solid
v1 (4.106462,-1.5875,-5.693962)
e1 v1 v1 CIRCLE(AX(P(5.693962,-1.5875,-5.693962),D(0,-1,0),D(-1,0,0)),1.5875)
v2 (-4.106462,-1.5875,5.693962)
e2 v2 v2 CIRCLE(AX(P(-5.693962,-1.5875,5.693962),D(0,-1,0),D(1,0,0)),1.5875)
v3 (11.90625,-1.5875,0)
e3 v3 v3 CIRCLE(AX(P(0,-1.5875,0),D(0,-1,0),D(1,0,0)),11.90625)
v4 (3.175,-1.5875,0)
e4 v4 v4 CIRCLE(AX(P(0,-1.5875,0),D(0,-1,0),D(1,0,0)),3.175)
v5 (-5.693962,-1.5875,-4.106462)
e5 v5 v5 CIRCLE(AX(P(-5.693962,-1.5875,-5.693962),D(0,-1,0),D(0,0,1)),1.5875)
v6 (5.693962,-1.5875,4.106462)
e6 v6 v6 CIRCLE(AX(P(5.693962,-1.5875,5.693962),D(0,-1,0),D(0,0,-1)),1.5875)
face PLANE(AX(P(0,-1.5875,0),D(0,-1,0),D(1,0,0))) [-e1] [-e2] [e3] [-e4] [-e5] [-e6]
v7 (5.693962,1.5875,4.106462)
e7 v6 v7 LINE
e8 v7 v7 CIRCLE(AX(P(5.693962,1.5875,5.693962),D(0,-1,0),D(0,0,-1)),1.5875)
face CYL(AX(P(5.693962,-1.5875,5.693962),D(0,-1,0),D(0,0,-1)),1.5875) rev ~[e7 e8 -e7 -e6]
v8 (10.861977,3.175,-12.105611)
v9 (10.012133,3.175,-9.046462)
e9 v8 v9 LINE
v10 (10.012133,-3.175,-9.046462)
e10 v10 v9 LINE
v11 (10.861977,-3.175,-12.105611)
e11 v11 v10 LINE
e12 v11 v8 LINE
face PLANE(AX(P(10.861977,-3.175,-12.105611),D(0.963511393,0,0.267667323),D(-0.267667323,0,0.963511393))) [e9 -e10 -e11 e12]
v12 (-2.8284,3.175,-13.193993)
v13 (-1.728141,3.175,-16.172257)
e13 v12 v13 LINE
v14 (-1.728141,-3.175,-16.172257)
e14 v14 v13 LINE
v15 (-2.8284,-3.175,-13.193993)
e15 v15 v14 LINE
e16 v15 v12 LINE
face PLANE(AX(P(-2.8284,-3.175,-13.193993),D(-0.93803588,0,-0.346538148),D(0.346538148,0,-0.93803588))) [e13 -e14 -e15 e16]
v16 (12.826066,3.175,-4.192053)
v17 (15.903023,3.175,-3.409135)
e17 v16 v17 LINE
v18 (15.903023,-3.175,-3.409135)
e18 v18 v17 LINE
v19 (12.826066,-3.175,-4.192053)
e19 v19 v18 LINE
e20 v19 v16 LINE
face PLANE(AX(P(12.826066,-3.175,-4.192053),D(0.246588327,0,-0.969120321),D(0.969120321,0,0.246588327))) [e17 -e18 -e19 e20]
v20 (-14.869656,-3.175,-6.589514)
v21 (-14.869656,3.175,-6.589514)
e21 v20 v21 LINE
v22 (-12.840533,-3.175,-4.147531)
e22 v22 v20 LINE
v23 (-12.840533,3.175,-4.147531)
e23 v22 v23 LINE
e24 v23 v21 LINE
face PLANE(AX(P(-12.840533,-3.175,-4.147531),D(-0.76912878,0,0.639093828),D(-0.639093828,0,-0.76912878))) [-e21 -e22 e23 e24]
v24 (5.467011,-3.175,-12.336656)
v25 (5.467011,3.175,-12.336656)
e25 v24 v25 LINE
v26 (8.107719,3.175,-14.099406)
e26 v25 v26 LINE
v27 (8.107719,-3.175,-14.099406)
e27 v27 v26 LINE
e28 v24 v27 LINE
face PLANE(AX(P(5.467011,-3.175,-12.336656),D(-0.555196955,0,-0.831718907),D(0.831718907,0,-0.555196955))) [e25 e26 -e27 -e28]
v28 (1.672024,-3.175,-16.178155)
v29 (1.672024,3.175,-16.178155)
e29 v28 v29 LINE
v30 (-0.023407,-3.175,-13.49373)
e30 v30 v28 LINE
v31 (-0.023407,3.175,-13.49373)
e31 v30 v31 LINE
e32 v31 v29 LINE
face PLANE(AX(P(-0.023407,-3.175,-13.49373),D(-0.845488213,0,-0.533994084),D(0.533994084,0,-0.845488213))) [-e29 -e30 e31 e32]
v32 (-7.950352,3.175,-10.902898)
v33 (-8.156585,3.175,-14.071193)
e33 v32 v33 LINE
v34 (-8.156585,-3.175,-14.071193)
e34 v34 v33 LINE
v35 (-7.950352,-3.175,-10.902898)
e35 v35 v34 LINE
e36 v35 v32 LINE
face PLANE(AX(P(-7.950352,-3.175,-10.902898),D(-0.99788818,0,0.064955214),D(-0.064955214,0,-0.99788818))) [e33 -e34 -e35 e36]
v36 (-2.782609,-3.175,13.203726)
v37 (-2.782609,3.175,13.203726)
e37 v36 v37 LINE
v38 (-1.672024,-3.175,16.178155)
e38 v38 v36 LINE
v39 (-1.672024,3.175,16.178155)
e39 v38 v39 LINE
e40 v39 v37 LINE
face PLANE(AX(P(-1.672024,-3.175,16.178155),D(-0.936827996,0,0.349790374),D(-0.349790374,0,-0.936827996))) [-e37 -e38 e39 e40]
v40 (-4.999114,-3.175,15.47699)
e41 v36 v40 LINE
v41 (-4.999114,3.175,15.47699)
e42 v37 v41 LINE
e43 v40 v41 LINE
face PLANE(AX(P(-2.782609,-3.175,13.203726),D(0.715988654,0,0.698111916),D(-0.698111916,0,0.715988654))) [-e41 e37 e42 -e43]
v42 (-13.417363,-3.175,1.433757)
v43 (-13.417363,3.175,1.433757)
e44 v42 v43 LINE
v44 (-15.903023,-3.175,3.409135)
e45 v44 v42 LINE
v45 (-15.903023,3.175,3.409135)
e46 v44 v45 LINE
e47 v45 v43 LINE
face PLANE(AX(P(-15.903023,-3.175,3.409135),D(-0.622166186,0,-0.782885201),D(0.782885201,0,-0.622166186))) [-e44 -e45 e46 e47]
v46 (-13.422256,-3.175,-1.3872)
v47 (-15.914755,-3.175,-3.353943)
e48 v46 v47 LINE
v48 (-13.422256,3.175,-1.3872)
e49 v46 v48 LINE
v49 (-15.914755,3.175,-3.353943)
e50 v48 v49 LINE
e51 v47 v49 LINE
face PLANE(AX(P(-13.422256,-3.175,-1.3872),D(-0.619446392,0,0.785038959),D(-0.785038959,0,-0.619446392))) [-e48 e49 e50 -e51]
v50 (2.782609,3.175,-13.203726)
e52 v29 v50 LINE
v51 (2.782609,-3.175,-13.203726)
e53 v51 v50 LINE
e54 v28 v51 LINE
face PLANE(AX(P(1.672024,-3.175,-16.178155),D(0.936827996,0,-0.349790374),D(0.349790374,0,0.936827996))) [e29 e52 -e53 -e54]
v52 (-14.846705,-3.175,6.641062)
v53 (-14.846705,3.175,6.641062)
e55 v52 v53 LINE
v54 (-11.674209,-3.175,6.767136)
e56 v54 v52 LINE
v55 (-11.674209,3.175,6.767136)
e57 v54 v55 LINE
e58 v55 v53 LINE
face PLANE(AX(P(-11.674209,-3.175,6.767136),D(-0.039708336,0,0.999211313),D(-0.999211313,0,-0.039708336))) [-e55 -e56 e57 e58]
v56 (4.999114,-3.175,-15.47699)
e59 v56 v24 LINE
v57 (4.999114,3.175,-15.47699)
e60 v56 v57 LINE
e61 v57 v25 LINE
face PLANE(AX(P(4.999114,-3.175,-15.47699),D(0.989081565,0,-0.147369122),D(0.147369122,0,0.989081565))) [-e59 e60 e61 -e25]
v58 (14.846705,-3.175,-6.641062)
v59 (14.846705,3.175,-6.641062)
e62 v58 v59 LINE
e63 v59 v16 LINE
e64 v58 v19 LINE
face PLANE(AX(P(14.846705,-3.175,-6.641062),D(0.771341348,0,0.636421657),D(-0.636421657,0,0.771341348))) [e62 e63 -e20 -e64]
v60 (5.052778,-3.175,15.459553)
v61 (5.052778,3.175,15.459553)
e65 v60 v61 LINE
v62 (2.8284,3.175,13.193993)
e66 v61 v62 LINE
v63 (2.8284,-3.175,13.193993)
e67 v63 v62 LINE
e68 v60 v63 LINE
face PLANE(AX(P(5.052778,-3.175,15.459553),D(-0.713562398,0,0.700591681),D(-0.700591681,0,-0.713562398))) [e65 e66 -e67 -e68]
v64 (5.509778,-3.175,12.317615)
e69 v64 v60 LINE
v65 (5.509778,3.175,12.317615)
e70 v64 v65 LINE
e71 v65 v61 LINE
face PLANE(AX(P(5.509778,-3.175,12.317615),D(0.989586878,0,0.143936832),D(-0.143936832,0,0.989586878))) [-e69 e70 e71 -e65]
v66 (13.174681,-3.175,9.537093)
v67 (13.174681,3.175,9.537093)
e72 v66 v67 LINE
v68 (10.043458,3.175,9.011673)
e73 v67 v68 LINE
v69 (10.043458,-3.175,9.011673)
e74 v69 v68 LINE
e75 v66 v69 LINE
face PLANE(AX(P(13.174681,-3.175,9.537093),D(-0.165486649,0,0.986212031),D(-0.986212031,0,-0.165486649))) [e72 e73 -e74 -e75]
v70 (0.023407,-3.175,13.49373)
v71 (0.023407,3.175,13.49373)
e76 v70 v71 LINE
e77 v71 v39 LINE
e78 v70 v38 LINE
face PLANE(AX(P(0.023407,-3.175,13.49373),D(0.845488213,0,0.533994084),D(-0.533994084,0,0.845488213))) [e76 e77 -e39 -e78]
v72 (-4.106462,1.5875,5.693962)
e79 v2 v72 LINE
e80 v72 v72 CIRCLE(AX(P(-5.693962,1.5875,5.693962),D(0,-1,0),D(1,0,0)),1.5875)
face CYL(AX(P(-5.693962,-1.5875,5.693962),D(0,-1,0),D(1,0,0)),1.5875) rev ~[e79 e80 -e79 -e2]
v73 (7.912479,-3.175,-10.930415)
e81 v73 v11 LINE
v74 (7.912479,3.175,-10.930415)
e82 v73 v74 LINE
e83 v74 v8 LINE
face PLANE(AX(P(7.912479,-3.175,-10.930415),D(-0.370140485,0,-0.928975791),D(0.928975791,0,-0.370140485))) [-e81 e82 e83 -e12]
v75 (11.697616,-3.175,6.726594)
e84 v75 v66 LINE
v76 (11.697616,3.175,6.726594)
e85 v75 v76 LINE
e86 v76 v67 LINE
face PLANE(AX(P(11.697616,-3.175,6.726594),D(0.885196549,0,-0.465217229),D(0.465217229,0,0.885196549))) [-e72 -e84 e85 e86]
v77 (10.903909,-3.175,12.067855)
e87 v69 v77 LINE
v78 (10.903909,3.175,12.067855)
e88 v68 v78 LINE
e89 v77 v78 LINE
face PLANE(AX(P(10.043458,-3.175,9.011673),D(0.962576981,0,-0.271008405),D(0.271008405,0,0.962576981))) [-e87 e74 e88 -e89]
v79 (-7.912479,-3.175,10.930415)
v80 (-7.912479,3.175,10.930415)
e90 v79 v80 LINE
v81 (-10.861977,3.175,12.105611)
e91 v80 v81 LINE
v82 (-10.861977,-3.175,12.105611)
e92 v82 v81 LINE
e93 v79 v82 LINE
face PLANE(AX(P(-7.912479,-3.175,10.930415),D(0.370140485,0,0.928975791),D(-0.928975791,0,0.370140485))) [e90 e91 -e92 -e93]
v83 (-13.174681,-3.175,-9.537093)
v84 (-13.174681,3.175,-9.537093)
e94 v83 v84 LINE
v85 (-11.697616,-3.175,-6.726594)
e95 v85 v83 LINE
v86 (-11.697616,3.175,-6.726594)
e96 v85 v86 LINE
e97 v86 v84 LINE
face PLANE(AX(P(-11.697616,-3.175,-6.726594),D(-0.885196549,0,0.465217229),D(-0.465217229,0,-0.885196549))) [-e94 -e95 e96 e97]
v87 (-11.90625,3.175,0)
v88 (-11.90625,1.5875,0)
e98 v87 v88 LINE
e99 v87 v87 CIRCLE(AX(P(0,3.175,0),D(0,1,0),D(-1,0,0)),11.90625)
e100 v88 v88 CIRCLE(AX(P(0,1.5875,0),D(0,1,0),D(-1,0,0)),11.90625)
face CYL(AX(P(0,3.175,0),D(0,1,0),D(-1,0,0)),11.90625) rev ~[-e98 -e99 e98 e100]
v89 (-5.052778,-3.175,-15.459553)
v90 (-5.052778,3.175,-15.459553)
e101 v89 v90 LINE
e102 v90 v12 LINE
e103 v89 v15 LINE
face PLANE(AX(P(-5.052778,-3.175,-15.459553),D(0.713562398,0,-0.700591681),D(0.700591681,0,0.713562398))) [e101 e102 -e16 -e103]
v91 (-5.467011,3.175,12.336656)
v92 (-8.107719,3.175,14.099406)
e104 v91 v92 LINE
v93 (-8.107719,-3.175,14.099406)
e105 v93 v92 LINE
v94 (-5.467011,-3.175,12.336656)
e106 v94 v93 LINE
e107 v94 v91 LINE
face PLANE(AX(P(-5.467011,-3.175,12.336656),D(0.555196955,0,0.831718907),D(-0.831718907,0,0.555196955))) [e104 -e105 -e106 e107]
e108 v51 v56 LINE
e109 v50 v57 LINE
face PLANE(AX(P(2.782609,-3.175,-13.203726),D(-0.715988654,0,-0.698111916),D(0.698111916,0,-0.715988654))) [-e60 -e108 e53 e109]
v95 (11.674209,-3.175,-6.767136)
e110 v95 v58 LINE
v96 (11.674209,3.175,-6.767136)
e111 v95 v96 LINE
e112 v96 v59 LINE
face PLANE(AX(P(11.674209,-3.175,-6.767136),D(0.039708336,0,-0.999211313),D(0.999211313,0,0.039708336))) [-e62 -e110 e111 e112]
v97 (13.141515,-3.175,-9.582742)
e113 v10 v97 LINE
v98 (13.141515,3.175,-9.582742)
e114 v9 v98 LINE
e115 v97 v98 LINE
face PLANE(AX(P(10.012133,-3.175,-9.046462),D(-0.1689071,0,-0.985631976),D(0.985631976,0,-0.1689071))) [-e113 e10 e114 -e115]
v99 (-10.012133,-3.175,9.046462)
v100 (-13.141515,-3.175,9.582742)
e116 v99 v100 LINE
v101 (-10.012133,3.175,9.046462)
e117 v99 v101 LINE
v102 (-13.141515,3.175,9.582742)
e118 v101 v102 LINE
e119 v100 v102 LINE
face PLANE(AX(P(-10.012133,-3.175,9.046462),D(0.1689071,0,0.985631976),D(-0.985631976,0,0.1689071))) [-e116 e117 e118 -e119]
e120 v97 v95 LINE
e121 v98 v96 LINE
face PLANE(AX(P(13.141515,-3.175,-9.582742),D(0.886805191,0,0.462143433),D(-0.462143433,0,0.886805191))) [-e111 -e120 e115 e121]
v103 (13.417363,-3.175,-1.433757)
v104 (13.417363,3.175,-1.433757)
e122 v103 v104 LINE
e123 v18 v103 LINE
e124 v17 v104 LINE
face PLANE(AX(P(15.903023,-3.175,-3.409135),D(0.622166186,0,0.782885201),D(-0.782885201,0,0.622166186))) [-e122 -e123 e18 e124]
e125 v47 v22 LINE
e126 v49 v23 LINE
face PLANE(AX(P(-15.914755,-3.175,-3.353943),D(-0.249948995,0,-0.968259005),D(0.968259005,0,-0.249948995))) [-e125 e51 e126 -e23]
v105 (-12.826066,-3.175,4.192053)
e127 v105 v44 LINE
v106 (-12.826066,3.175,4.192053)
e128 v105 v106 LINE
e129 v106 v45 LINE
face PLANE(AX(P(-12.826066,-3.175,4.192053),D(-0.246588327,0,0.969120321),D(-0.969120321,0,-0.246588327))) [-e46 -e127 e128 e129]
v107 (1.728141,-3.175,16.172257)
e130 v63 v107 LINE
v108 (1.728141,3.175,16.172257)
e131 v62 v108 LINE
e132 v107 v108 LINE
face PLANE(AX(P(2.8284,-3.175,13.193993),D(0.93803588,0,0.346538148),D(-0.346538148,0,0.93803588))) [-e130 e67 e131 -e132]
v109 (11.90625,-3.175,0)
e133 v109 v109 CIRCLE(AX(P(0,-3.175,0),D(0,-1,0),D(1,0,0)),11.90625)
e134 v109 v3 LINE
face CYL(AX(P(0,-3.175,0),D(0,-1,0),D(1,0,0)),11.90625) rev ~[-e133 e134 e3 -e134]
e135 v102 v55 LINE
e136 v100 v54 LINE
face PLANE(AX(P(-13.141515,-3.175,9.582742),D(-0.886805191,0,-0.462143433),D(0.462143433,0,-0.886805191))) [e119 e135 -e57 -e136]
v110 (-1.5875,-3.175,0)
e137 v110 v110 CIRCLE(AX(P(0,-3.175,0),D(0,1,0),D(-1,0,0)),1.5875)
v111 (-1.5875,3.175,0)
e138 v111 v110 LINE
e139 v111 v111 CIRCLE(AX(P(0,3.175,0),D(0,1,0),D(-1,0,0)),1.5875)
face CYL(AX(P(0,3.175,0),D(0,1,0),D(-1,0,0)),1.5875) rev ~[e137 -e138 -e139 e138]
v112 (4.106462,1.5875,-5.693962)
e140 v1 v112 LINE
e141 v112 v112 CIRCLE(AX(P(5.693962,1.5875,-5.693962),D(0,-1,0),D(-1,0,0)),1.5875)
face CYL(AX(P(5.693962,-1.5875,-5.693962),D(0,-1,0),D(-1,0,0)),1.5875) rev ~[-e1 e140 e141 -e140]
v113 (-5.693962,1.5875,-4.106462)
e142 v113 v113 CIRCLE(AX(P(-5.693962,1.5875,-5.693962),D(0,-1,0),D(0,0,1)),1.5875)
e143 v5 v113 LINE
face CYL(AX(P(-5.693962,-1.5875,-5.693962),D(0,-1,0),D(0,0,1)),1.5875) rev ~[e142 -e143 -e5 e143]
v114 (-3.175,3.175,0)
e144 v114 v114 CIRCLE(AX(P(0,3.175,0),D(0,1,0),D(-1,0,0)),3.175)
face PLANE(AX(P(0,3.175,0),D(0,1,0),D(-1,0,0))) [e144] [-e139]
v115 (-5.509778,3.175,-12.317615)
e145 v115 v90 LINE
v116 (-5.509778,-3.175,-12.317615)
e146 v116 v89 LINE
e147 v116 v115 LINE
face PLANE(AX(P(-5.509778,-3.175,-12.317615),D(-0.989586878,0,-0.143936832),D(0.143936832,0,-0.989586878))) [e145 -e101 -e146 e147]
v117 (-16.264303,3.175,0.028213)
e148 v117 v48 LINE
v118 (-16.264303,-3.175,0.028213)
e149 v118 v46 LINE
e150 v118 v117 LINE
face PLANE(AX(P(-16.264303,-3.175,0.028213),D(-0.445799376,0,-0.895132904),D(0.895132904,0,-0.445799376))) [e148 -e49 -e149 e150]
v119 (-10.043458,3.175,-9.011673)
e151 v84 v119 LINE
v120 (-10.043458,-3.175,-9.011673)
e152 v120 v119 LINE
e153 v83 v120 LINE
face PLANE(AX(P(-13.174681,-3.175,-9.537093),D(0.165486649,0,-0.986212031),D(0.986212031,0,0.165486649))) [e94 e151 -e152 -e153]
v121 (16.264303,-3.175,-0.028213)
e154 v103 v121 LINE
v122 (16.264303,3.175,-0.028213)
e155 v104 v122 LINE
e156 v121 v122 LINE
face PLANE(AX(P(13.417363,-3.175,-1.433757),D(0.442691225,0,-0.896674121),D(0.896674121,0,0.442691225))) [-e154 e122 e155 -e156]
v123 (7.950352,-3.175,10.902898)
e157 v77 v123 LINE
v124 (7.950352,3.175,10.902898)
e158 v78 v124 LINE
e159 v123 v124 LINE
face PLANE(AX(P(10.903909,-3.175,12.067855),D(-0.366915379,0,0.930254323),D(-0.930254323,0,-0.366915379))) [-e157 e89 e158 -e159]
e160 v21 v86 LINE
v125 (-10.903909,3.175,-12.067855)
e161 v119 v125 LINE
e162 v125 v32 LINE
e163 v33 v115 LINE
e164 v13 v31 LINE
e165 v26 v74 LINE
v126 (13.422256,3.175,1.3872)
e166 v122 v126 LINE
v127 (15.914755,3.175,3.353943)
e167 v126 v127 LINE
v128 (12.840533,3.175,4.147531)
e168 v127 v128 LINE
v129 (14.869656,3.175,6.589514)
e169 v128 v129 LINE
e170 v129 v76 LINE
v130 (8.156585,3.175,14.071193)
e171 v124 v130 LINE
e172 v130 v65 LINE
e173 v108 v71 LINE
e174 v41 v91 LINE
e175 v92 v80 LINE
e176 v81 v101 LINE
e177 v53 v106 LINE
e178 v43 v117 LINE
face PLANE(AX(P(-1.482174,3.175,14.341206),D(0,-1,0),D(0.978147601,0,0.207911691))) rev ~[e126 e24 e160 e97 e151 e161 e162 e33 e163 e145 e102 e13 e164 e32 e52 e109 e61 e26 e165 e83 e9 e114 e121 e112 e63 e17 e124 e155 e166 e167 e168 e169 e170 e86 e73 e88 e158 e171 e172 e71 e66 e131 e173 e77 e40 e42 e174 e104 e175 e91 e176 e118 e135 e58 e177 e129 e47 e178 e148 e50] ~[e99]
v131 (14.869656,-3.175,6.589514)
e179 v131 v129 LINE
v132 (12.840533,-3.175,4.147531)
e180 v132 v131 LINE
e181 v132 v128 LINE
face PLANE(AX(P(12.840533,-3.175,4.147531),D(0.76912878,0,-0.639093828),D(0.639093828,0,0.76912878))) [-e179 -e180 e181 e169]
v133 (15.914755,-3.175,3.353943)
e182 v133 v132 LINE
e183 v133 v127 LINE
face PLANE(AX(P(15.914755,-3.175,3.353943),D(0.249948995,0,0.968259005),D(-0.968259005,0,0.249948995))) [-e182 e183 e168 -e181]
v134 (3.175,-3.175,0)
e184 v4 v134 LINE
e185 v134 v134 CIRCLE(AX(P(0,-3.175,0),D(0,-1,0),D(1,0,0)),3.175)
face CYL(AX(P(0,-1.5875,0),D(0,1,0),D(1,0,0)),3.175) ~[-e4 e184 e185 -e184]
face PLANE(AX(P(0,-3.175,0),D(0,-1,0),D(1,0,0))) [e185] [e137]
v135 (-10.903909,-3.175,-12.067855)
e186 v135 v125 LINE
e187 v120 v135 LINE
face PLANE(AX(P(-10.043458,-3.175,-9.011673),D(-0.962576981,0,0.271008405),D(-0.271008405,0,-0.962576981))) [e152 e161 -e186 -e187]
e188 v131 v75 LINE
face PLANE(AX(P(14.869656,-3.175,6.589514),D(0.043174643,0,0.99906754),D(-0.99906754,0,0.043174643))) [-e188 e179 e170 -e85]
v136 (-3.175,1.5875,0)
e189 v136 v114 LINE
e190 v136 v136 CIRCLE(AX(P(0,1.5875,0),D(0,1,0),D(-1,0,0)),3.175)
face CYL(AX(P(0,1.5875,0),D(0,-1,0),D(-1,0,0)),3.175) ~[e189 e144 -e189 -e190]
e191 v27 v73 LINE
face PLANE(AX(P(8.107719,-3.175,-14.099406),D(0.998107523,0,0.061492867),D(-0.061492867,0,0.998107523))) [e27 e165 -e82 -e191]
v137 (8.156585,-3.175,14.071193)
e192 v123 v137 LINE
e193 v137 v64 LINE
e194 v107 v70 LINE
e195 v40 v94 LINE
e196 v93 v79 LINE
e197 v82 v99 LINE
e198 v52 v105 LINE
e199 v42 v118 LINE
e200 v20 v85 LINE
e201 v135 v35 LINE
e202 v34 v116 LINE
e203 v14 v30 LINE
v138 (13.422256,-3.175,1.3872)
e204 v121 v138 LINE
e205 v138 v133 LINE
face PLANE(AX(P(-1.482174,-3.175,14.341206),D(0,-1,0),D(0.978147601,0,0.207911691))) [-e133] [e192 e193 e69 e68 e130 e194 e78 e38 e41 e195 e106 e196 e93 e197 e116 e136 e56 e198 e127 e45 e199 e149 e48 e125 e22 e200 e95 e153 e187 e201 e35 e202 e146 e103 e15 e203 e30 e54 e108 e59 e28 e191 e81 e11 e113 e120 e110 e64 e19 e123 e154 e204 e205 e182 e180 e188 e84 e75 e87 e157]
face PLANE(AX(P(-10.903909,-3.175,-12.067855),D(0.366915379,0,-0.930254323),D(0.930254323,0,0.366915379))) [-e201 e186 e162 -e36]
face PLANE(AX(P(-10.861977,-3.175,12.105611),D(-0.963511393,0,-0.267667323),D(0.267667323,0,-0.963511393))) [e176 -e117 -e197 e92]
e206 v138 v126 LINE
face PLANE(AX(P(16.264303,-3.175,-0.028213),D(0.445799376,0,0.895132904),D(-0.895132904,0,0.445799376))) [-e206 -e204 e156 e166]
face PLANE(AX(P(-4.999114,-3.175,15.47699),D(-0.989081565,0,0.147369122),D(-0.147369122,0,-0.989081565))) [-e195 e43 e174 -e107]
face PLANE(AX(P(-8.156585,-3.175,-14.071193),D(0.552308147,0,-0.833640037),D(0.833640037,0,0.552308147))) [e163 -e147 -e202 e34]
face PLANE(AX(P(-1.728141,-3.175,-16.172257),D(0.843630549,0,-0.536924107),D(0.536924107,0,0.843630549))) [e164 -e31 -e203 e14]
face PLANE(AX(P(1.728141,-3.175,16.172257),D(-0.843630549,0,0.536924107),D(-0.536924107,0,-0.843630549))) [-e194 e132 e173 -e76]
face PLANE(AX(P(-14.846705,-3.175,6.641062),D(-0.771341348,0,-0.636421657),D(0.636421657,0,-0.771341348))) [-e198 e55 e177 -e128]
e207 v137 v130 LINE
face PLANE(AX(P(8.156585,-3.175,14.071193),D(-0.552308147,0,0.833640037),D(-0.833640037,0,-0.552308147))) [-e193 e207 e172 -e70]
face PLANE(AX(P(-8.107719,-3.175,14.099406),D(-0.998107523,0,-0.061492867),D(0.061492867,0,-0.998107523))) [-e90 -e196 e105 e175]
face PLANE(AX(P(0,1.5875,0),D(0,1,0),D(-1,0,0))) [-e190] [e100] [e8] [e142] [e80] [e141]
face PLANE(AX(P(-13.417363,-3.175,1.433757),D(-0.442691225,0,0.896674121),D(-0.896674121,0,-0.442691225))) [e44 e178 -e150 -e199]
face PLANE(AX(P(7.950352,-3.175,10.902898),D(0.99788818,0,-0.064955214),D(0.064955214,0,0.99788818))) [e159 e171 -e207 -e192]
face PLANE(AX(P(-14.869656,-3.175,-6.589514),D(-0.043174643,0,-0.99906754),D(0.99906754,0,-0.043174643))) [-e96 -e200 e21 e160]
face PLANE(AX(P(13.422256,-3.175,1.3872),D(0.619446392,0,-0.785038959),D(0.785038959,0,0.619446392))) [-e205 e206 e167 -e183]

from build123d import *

# Parameters (mm, degrees)
F0_R            = 13.49375
F1_DEPTH        = 3.175
F3_DEPTH        = 6.35
F3_COPIES_COUNT = 30
F4_R            = 11.90625
F5_DEPTH        = 1.5875
F6_R            = 11.90625
F7_DEPTH        = 1.5875
F8_R            = 1.5875
F9_DEPTH        = 4.7635
F9_COPIES_COUNT = 4
F10_R           = 3.175
F11_DEPTH       = 1.5875
F12_R           = 3.175
F13_DEPTH       = 1.5875
F14_R           = 1.5875
F15_DEPTH       = 6.351


# Not quite as in the source:
# - a pattern or mirror of a feature is missing from the dataset's text; its kind, count and spacing are read off the source's solid


with BuildPart() as f1:
    # F0 (on Front) → F1 (new body, symmetric)
    with BuildSketch(Plane.XZ):
        Circle(F0_R)
    extrude(amount=F1_DEPTH, both=True)

    # F2 (on face) → F3 (join)
    with BuildSketch(Plane.XZ.offset(3.175)):
        with BuildLine():
            Line((1.7281408885, 16.1722566911), (0.0234068474, 13.4937296987))
            ThreePointArc((0.0234068474, 13.4937296987), (1.4337574514, 13.4173629538), (2.8283995087, 13.1939927725))
            Line((2.8283995087, 13.1939927725), (1.7281408885, 16.1722566911))
        make_face()
    f3 = extrude(amount=-F3_DEPTH)

    # F3_copies: F3 ×30 about axis
    f3_copies_axis = Axis((0, 0, 0), (0, 1, 0))
    for i in range(1, F3_COPIES_COUNT):
        add(f3.rotate(f3_copies_axis, i * 360 / F3_COPIES_COUNT))

    # F4 (on face) → F5 (cut)
    with BuildSketch(Plane.XZ.offset(3.175)):
        Circle(F4_R)
    extrude(amount=-F5_DEPTH, mode=Mode.SUBTRACT)

    # F6 (on face) → F7 (cut)
    with BuildSketch(Plane(origin=(0, 3.175, 0), x_dir=(-1, 0, 0), z_dir=(0, 1, 0))):
        Circle(F6_R)
    extrude(amount=-F7_DEPTH, mode=Mode.SUBTRACT)

    # F8 (on face) → F9 (cut, through all)
    with BuildSketch(Plane.XZ.offset(1.5875)):
        with Locations((-5.6939616362, 5.6939616362)):
            Circle(F8_R)
    f9 = extrude(amount=-F9_DEPTH, mode=Mode.SUBTRACT)

    # F9_copies: F9 ×4 about axis
    f9_copies_axis = Axis((0, 0, 0), (0, 1, 0))
    for i in range(1, F9_COPIES_COUNT):
        add(f9.rotate(f9_copies_axis, i * 360 / F9_COPIES_COUNT), mode=Mode.SUBTRACT)

    # F10 (on face) → F11 (join)
    with BuildSketch(Plane.XZ.offset(1.5875)):
        Circle(F10_R)
    extrude(amount=F11_DEPTH)

    # F12 (on face) → F13 (join)
    with BuildSketch(Plane(origin=(0, 1.5875, 0), x_dir=(-1, 0, 0), z_dir=(0, 1, 0))):
        Circle(F12_R)
    extrude(amount=F13_DEPTH)

    # F14 (on face) → F15 (cut, through all)
    with BuildSketch(Plane(origin=(0, 3.175, 0), x_dir=(-1, 0, 0), z_dir=(0, 1, 0))):
        Circle(F14_R)
    extrude(amount=-F15_DEPTH, mode=Mode.SUBTRACT)


solid = f1.part
